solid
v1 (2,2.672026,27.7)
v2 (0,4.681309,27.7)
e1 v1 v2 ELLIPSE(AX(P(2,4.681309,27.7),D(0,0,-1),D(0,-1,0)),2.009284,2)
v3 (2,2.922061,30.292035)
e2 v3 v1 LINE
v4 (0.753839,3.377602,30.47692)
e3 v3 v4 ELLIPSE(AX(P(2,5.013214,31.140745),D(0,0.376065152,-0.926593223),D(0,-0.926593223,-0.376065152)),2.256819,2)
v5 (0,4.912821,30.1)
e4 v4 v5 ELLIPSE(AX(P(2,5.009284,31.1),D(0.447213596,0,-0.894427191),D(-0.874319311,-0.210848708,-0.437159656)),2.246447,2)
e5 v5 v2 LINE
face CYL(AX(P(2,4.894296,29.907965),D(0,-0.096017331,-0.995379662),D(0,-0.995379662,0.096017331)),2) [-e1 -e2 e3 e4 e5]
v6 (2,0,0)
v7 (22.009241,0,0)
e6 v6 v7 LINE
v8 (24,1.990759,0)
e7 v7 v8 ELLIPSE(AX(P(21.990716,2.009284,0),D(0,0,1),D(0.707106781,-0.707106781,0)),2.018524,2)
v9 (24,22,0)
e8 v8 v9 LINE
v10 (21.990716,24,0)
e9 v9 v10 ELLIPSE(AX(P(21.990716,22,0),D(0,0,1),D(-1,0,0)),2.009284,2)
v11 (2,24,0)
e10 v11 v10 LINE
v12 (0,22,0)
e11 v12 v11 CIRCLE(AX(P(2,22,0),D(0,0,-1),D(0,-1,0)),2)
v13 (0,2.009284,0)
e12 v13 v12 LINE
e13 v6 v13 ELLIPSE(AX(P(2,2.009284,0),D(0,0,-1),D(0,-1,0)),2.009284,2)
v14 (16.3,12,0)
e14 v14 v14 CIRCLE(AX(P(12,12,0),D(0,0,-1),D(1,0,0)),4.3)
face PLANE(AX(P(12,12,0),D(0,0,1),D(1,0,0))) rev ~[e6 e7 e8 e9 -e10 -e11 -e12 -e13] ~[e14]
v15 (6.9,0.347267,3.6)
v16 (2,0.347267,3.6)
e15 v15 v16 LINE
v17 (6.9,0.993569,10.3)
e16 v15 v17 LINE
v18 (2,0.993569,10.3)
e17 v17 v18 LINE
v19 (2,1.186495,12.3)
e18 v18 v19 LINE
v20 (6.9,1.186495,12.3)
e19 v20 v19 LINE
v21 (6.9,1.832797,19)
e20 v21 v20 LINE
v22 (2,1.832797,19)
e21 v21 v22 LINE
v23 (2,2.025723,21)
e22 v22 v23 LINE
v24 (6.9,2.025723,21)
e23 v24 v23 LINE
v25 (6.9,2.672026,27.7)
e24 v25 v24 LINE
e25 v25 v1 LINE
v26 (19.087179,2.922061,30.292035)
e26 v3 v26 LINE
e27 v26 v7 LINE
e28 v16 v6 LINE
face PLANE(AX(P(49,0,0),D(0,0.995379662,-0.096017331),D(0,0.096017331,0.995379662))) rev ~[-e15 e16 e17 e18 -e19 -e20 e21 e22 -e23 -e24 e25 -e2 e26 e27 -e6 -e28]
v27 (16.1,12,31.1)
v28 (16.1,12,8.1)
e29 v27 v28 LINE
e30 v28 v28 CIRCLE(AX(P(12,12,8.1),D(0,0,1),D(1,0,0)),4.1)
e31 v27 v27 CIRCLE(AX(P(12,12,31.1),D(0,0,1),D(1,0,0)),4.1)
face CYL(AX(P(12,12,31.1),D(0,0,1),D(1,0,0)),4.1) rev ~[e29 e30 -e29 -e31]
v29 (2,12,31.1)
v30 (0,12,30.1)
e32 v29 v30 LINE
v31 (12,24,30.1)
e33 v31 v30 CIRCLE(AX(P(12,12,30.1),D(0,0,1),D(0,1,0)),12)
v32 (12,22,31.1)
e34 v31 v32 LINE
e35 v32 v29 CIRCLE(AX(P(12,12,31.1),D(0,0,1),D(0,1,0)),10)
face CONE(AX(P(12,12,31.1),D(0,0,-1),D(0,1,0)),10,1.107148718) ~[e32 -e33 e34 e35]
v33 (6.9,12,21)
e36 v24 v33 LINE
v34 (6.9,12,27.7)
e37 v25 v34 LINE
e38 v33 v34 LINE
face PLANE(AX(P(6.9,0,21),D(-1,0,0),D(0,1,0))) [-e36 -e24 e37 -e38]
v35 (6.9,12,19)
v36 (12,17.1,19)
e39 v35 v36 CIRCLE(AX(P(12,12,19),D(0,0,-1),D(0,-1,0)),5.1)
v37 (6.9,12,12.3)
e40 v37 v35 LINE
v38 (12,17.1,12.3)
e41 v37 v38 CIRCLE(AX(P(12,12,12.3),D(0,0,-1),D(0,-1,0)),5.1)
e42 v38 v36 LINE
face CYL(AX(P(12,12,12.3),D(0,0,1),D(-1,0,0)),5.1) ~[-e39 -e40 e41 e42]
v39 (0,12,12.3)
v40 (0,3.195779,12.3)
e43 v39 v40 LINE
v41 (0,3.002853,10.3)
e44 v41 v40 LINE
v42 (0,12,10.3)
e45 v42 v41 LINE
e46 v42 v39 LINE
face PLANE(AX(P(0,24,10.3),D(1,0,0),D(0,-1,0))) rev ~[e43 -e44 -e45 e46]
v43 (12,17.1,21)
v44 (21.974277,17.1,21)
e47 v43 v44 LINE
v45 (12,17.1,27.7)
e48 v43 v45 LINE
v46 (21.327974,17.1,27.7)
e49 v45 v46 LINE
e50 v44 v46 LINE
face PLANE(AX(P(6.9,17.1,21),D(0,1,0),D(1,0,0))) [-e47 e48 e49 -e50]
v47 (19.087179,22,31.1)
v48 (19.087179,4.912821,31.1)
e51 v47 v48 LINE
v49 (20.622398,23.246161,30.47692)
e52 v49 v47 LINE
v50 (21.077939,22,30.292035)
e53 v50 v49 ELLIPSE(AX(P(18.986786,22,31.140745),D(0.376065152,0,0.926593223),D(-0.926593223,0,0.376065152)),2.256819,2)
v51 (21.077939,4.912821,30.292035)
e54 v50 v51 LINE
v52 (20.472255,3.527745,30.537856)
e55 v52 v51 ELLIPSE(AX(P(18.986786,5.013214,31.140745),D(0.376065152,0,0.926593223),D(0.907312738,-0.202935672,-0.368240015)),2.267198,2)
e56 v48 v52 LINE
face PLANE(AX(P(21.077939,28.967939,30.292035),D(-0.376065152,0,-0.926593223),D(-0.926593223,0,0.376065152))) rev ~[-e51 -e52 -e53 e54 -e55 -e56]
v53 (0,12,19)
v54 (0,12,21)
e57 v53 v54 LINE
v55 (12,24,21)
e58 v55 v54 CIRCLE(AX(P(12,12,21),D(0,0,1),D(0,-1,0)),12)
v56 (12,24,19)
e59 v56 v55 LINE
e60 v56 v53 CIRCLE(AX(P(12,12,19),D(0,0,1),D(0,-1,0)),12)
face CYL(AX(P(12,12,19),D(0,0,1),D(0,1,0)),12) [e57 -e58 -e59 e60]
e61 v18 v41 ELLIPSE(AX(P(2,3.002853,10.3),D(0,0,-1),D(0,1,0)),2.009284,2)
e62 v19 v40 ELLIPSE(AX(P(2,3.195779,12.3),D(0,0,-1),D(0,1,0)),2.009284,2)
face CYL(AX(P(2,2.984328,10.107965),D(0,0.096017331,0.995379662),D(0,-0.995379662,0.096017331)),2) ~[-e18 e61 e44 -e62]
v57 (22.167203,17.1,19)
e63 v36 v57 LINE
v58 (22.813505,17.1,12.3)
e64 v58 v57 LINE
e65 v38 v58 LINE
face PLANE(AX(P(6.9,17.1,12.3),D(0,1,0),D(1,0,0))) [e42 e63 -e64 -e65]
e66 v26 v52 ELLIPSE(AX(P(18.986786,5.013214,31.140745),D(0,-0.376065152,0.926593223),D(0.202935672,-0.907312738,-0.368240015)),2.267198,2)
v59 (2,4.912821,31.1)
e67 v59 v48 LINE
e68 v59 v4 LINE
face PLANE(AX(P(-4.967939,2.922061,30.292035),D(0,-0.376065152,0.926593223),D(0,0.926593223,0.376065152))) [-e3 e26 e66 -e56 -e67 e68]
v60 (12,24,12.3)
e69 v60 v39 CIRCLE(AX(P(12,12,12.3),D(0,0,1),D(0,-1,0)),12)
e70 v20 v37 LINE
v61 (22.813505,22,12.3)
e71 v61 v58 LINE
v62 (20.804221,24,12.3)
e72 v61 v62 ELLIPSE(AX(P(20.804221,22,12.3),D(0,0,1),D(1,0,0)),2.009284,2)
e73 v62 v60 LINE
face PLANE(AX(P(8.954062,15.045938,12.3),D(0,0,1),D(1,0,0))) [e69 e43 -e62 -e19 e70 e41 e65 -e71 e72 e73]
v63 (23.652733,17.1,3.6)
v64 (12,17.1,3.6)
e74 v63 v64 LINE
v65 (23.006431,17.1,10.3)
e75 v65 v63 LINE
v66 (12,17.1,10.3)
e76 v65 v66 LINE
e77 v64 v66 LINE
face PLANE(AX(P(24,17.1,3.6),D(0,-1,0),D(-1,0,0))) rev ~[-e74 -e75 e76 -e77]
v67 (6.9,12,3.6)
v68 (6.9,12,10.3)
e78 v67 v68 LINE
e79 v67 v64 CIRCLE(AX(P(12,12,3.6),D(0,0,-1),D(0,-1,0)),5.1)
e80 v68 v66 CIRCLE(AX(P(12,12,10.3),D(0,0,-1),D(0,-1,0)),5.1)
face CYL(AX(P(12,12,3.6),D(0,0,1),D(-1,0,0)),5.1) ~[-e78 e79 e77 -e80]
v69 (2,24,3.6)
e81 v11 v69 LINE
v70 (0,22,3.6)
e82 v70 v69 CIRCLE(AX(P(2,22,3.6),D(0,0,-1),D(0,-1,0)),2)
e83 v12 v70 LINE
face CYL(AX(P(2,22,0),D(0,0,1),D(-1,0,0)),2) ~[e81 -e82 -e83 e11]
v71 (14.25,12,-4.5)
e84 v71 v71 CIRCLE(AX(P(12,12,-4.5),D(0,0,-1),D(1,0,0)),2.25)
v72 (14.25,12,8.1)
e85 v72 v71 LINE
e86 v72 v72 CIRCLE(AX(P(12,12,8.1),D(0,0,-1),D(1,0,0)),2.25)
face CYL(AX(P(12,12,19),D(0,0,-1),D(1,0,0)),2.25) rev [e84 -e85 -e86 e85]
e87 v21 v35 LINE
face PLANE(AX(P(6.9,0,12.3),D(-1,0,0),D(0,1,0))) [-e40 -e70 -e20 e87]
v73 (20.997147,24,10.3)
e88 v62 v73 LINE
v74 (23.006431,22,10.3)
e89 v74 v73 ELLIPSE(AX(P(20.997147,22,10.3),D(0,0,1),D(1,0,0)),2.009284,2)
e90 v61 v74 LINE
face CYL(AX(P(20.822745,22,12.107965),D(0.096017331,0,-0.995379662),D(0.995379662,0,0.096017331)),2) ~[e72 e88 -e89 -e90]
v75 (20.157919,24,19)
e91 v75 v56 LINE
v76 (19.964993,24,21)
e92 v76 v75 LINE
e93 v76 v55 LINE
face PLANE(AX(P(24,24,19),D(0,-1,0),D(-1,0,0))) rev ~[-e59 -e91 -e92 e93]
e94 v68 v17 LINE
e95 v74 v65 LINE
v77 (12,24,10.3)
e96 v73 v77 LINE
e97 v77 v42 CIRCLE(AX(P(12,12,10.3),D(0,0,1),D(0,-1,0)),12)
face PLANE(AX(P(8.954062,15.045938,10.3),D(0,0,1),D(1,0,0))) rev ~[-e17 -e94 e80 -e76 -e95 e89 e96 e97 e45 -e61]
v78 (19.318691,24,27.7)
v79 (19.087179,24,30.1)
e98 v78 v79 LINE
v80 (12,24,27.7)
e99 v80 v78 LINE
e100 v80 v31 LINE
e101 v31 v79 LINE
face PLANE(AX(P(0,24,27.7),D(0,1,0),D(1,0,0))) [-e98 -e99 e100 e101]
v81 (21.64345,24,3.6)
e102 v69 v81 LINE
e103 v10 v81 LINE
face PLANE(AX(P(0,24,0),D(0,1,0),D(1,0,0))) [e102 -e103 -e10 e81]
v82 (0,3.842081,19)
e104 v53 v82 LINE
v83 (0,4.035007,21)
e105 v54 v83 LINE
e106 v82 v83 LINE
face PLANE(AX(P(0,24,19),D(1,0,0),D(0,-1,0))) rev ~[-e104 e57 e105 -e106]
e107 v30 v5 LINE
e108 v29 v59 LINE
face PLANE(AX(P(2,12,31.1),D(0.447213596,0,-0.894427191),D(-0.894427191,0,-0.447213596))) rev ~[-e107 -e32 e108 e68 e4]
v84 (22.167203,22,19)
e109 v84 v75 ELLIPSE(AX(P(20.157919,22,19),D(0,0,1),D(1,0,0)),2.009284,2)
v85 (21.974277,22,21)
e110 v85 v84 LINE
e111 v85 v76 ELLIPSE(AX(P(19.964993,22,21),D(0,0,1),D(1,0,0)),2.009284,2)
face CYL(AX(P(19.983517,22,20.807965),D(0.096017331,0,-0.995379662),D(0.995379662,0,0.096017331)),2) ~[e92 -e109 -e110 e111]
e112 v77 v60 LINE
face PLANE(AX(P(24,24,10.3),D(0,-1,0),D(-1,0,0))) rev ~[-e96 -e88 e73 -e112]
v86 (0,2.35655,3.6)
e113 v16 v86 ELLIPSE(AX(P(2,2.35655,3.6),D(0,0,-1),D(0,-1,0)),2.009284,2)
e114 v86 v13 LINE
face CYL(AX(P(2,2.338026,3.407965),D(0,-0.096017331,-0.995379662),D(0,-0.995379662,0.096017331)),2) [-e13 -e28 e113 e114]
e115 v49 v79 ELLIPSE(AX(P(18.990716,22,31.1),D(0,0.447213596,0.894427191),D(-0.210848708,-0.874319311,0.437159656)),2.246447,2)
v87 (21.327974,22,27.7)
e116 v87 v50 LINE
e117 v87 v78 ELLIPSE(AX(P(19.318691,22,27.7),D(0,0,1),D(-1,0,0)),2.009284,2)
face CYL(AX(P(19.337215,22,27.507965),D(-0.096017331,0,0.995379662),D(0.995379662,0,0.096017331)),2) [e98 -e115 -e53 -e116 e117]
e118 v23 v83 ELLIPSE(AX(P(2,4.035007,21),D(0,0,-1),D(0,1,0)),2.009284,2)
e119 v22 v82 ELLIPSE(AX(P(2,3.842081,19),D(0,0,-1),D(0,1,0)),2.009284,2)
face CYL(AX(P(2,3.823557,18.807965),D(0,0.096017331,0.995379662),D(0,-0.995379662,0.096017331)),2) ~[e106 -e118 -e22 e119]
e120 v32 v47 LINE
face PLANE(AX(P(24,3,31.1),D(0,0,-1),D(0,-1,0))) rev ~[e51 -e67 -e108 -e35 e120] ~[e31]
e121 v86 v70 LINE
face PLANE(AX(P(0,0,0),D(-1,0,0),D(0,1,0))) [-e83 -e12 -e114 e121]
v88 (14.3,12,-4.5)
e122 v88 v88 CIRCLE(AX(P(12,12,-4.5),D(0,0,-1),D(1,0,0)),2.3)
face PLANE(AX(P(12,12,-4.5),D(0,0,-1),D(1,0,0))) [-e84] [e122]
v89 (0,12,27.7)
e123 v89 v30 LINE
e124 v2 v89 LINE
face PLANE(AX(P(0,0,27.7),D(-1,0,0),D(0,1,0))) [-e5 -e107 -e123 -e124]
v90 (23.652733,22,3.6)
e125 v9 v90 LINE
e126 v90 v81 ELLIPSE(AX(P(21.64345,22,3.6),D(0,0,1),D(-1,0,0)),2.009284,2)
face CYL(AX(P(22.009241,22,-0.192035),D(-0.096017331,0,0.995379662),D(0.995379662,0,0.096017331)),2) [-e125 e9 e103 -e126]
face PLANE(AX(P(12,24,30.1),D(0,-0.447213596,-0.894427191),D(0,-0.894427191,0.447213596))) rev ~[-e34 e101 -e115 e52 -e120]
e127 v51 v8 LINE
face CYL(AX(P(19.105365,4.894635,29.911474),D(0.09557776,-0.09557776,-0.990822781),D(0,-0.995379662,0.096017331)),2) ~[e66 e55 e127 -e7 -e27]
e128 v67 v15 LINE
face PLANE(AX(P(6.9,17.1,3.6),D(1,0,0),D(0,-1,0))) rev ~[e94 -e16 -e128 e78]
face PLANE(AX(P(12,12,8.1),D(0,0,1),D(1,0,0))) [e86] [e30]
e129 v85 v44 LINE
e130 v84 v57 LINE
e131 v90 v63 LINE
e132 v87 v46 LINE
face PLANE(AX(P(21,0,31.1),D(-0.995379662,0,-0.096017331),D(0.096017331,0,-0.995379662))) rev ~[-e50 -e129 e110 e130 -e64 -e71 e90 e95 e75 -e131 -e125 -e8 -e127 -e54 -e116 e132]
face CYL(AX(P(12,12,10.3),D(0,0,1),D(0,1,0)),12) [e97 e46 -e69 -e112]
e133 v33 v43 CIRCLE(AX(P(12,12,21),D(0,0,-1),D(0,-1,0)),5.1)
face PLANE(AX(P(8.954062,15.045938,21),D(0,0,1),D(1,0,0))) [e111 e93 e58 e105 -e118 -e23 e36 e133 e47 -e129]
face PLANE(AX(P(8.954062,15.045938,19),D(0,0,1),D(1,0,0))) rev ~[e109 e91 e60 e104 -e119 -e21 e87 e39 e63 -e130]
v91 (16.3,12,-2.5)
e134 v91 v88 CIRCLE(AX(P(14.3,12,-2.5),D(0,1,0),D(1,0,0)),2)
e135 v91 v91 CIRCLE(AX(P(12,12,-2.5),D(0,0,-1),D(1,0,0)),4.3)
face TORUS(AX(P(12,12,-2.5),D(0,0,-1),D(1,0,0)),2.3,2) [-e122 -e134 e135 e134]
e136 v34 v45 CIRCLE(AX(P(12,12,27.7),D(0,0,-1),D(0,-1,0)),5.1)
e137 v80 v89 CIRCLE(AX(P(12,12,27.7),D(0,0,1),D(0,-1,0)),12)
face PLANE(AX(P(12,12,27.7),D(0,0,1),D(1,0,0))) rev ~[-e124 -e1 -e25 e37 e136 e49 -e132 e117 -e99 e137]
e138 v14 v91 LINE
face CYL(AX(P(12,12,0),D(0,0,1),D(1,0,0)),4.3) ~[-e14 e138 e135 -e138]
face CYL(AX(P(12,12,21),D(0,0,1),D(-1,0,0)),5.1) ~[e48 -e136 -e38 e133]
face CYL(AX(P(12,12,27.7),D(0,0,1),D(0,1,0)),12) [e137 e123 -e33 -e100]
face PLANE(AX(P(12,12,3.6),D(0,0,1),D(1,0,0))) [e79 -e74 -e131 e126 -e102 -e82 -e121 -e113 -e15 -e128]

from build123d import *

# Parameters (mm, degrees)
F0_W          = 24
F0_H          = 24
F1_DEPTH      = 3.6
F2_R          = 4.3
F2_R_2        = 2.25
F3_DEPTH      = 4.5
F4_DEPTH      = 10
F5_R          = 2.25
F6_DEPTH      = 6.7
F7_W          = 17.1
F7_H          = 17.1
F7_R          = 2.25
F8_DEPTH      = 2
F9_W          = 17.1
F9_H          = 17.1
F9_R          = 2.25
F10_DEPTH     = 6.7
F11_W         = 17.1
F11_H         = 17.1
F11_R         = 2.25
F12_DEPTH     = 2
F13_W         = 17.1
F13_H         = 17.1
F14_DEPTH     = 6.7
F15_W         = 24
F15_H         = 24
F16_DEPTH     = 3.4
F17_R         = 5.1
F18_R         = 12
F19_R         = 4.1
F20_DEPTH     = 23
F23_DEPTH     = 25
F24_DEPTH     = 25
F25_DEPTH     = 50
F26_T1_DEPTH  = 14.1796577476
F26_T3_DEPTH  = 30.9358787863
F26_T5_DEPTH  = 30.9358787863
F26_T7_DEPTH  = 14.1796577476
F26_T10_ANGLE = 90
F27_R         = 2
F28_R         = 2
F29_R         = 2


# Not quite as in the source:
# - a fillet or chamfer that OpenCascade refuses, or shapes differently, is made with other operations: its cross-section is extruded or revolved along the edge and cut away or added


with BuildPart() as f1:
    # F0 (on Top) → F1 (new body)
    with BuildSketch(Plane.XY):
        with Locations((12, 12)):
            Rectangle(F0_W, F0_H)
    extrude(amount=F1_DEPTH)

    # F2 (on face) → F3 (join)
    with BuildSketch(Plane(origin=(0, 0, 0), x_dir=(1, 0, 0), z_dir=(0, 0, -1))):
        with Locations((12, -12)):
            Circle(F2_R)
        with Locations((12, -12)):
            Circle(F2_R_2, mode=Mode.SUBTRACT)
    extrude(amount=F3_DEPTH)

    # F4 (cut): a face of the model
    f4_faces = [f1.faces().sort_by_distance(p)[0] for p in [
        (12, 12, 0),
    ]]
    extrude(f4_faces, amount=-F4_DEPTH, mode=Mode.SUBTRACT)

    # F5 (on face) → F6 (join)
    with BuildSketch(Plane.XY.offset(3.6)):
        Polygon((6.9, 0), (20, 0), (24, 0), (24, 17.1), (6.9, 17.1), align=None)
        with Locations((12, 12)):
            Circle(F5_R, mode=Mode.SUBTRACT)
    extrude(amount=F6_DEPTH)

    # F7 (on face) → F8 (join)
    with BuildSketch(Plane.XY.offset(10.3)):
        Polygon((0, 24), (0, 0), (6.9, 0), (6.9, 17.1), (24, 17.1), (24, 24), align=None)
        with Locations((15.45, 8.55)):
            Rectangle(F7_W, F7_H)
        with Locations((12, 12)):
            Circle(F7_R, mode=Mode.SUBTRACT)
    extrude(amount=F8_DEPTH)

    # F9 (on face) → F10 (join)
    with BuildSketch(Plane.XY.offset(12.3)):
        with Locations((15.45, 8.55)):
            Rectangle(F9_W, F9_H)
        with Locations((12, 12)):
            Circle(F9_R, mode=Mode.SUBTRACT)
    extrude(amount=F10_DEPTH)

    # F11 (on face) → F12 (join)
    with BuildSketch(Plane.XY.offset(19)):
        Polygon((0, 0), (6.9, 0), (6.9, 17.1), (24, 17.1), (24, 24), (0, 24), align=None)
        with Locations((15.45, 8.55)):
            Rectangle(F11_W, F11_H)
        with Locations((12, 12)):
            Circle(F11_R, mode=Mode.SUBTRACT)
    extrude(amount=F12_DEPTH)

    # F13 (on face) → F14 (join)
    with BuildSketch(Plane.XY.offset(21)):
        with Locations((15.45, 8.55)):
            Rectangle(F13_W, F13_H)
    extrude(amount=F14_DEPTH)

    # F15 (on face) → F16 (join)
    with BuildSketch(Plane.XY.offset(27.7)):
        with Locations((12, 12)):
            Rectangle(F15_W, F15_H)
    extrude(amount=F16_DEPTH)

    # F17
    f17_edges = [f1.edges().sort_by_distance(p)[0] for p in [
        (6.9, 17.1, 6.95),
        (6.9, 17.1, 15.65),
        (6.9, 17.1, 24.35),
    ]]
    fillet(f17_edges, radius=F17_R)

    # F18
    f18_edges = [f1.edges().sort_by_distance(p)[0] for p in [
        (0, 24, 11.3),
        (0, 24, 20),
        (0, 24, 29.4),
    ]]
    fillet(f18_edges, radius=F18_R)

    # F19 (on face) → F20 (cut)
    with BuildSketch(Plane.XY.offset(31.1)):
        with Locations((12, 12)):
            Circle(F19_R)
    extrude(amount=-F20_DEPTH, mode=Mode.SUBTRACT)

    # F21 (on face) → F23 (join)
    with BuildSketch(Plane.YZ.offset(24)):
        Polygon((0, 31.1), (0, 0), (3, 31.1), align=None)
    extrude(amount=F23_DEPTH)

    # F22 (on face) → F24 (cut)
    with BuildSketch(Plane.XZ):
        Polygon((21, 31.1), (24, 0), (24, 31.1), align=None)
    extrude(amount=-F24_DEPTH, mode=Mode.SUBTRACT)

    # F25 (cut): a face of the model
    f25_faces = [f1.faces().sort_by_distance(p)[0] for p in [
        (49, 1, 20.7333333333),
    ]]
    extrude(f25_faces, amount=-F25_DEPTH, mode=Mode.SUBTRACT)

    # F26: chamfer of 1 x 2 on 5 edges, made by hand

    # F26_s2 → F26_t1 (cut)
    with BuildSketch(Plane.XZ.offset(-12)):
        Polygon((2, 31.1), (0, 30.1), (0, 31.1), align=None)
    extrude(amount=F26_T1_DEPTH, mode=Mode.SUBTRACT)

    # F26_s4 → F26_t3 (cut)
    with BuildSketch(Plane.YZ.offset(-4.9679393932)):
        Polygon((2.9220612214, 30.2920346615), (4.912820546, 31.1), (3, 31.1), align=None)
    extrude(amount=F26_T3_DEPTH, mode=Mode.SUBTRACT)

    # F26_s6 → F26_t5 (cut)
    with BuildSketch(Plane.XZ.offset(-28.9679393932)):
        Polygon((21.0779387786, 30.2920346615), (19.087179454, 31.1), (21, 31.1), align=None)
    extrude(amount=F26_T5_DEPTH, mode=Mode.SUBTRACT)

    # F26_s8 → F26_t7 (cut)
    with BuildSketch(Plane.YZ.offset(12)):
        Polygon((24, 30.1), (22, 31.1), (24, 31.1), align=None)
    extrude(amount=F26_T7_DEPTH, mode=Mode.SUBTRACT)

    # F26_s9 → F26_t10 (revolve, cut)
    with BuildSketch(Plane.YZ.offset(12)):
        Polygon((22, 31.1), (24, 30.1), (24, 31.1), align=None)
    revolve(axis=Axis((12, 12, 31.1), (0, 0, 1)), revolution_arc=F26_T10_ANGLE, mode=Mode.SUBTRACT)

    # F27
    f27_edges = [f1.edges().sort_by_distance(p)[0] for p in [
        (22.538969, 1.461031, 15.146017),
    ]]
    fillet(f27_edges, radius=F27_R)

    # F28
    f28_edges = [f1.edges().sort_by_distance(p)[0] for p in [
        (0, 2.787781, 28.9),
        (0, 1.92926, 20),
        (0, 1.090032, 11.3),
        (0, 0.173633, 1.8),
        (0, 24, 1.8),
        (23.826367, 24, 1.8),
        (22.909968, 24, 11.3),
        (22.07074, 24, 20),
        (21.212219, 24, 28.9),
    ]]
    fillet(f28_edges, radius=F28_R)

    # F29
    f29_edges = [f1.edges().sort_by_distance(p)[0] for p in [
        (7.7, 12, -4.5),
    ]]
    fillet(f29_edges, radius=F29_R)


solid = f1.part
